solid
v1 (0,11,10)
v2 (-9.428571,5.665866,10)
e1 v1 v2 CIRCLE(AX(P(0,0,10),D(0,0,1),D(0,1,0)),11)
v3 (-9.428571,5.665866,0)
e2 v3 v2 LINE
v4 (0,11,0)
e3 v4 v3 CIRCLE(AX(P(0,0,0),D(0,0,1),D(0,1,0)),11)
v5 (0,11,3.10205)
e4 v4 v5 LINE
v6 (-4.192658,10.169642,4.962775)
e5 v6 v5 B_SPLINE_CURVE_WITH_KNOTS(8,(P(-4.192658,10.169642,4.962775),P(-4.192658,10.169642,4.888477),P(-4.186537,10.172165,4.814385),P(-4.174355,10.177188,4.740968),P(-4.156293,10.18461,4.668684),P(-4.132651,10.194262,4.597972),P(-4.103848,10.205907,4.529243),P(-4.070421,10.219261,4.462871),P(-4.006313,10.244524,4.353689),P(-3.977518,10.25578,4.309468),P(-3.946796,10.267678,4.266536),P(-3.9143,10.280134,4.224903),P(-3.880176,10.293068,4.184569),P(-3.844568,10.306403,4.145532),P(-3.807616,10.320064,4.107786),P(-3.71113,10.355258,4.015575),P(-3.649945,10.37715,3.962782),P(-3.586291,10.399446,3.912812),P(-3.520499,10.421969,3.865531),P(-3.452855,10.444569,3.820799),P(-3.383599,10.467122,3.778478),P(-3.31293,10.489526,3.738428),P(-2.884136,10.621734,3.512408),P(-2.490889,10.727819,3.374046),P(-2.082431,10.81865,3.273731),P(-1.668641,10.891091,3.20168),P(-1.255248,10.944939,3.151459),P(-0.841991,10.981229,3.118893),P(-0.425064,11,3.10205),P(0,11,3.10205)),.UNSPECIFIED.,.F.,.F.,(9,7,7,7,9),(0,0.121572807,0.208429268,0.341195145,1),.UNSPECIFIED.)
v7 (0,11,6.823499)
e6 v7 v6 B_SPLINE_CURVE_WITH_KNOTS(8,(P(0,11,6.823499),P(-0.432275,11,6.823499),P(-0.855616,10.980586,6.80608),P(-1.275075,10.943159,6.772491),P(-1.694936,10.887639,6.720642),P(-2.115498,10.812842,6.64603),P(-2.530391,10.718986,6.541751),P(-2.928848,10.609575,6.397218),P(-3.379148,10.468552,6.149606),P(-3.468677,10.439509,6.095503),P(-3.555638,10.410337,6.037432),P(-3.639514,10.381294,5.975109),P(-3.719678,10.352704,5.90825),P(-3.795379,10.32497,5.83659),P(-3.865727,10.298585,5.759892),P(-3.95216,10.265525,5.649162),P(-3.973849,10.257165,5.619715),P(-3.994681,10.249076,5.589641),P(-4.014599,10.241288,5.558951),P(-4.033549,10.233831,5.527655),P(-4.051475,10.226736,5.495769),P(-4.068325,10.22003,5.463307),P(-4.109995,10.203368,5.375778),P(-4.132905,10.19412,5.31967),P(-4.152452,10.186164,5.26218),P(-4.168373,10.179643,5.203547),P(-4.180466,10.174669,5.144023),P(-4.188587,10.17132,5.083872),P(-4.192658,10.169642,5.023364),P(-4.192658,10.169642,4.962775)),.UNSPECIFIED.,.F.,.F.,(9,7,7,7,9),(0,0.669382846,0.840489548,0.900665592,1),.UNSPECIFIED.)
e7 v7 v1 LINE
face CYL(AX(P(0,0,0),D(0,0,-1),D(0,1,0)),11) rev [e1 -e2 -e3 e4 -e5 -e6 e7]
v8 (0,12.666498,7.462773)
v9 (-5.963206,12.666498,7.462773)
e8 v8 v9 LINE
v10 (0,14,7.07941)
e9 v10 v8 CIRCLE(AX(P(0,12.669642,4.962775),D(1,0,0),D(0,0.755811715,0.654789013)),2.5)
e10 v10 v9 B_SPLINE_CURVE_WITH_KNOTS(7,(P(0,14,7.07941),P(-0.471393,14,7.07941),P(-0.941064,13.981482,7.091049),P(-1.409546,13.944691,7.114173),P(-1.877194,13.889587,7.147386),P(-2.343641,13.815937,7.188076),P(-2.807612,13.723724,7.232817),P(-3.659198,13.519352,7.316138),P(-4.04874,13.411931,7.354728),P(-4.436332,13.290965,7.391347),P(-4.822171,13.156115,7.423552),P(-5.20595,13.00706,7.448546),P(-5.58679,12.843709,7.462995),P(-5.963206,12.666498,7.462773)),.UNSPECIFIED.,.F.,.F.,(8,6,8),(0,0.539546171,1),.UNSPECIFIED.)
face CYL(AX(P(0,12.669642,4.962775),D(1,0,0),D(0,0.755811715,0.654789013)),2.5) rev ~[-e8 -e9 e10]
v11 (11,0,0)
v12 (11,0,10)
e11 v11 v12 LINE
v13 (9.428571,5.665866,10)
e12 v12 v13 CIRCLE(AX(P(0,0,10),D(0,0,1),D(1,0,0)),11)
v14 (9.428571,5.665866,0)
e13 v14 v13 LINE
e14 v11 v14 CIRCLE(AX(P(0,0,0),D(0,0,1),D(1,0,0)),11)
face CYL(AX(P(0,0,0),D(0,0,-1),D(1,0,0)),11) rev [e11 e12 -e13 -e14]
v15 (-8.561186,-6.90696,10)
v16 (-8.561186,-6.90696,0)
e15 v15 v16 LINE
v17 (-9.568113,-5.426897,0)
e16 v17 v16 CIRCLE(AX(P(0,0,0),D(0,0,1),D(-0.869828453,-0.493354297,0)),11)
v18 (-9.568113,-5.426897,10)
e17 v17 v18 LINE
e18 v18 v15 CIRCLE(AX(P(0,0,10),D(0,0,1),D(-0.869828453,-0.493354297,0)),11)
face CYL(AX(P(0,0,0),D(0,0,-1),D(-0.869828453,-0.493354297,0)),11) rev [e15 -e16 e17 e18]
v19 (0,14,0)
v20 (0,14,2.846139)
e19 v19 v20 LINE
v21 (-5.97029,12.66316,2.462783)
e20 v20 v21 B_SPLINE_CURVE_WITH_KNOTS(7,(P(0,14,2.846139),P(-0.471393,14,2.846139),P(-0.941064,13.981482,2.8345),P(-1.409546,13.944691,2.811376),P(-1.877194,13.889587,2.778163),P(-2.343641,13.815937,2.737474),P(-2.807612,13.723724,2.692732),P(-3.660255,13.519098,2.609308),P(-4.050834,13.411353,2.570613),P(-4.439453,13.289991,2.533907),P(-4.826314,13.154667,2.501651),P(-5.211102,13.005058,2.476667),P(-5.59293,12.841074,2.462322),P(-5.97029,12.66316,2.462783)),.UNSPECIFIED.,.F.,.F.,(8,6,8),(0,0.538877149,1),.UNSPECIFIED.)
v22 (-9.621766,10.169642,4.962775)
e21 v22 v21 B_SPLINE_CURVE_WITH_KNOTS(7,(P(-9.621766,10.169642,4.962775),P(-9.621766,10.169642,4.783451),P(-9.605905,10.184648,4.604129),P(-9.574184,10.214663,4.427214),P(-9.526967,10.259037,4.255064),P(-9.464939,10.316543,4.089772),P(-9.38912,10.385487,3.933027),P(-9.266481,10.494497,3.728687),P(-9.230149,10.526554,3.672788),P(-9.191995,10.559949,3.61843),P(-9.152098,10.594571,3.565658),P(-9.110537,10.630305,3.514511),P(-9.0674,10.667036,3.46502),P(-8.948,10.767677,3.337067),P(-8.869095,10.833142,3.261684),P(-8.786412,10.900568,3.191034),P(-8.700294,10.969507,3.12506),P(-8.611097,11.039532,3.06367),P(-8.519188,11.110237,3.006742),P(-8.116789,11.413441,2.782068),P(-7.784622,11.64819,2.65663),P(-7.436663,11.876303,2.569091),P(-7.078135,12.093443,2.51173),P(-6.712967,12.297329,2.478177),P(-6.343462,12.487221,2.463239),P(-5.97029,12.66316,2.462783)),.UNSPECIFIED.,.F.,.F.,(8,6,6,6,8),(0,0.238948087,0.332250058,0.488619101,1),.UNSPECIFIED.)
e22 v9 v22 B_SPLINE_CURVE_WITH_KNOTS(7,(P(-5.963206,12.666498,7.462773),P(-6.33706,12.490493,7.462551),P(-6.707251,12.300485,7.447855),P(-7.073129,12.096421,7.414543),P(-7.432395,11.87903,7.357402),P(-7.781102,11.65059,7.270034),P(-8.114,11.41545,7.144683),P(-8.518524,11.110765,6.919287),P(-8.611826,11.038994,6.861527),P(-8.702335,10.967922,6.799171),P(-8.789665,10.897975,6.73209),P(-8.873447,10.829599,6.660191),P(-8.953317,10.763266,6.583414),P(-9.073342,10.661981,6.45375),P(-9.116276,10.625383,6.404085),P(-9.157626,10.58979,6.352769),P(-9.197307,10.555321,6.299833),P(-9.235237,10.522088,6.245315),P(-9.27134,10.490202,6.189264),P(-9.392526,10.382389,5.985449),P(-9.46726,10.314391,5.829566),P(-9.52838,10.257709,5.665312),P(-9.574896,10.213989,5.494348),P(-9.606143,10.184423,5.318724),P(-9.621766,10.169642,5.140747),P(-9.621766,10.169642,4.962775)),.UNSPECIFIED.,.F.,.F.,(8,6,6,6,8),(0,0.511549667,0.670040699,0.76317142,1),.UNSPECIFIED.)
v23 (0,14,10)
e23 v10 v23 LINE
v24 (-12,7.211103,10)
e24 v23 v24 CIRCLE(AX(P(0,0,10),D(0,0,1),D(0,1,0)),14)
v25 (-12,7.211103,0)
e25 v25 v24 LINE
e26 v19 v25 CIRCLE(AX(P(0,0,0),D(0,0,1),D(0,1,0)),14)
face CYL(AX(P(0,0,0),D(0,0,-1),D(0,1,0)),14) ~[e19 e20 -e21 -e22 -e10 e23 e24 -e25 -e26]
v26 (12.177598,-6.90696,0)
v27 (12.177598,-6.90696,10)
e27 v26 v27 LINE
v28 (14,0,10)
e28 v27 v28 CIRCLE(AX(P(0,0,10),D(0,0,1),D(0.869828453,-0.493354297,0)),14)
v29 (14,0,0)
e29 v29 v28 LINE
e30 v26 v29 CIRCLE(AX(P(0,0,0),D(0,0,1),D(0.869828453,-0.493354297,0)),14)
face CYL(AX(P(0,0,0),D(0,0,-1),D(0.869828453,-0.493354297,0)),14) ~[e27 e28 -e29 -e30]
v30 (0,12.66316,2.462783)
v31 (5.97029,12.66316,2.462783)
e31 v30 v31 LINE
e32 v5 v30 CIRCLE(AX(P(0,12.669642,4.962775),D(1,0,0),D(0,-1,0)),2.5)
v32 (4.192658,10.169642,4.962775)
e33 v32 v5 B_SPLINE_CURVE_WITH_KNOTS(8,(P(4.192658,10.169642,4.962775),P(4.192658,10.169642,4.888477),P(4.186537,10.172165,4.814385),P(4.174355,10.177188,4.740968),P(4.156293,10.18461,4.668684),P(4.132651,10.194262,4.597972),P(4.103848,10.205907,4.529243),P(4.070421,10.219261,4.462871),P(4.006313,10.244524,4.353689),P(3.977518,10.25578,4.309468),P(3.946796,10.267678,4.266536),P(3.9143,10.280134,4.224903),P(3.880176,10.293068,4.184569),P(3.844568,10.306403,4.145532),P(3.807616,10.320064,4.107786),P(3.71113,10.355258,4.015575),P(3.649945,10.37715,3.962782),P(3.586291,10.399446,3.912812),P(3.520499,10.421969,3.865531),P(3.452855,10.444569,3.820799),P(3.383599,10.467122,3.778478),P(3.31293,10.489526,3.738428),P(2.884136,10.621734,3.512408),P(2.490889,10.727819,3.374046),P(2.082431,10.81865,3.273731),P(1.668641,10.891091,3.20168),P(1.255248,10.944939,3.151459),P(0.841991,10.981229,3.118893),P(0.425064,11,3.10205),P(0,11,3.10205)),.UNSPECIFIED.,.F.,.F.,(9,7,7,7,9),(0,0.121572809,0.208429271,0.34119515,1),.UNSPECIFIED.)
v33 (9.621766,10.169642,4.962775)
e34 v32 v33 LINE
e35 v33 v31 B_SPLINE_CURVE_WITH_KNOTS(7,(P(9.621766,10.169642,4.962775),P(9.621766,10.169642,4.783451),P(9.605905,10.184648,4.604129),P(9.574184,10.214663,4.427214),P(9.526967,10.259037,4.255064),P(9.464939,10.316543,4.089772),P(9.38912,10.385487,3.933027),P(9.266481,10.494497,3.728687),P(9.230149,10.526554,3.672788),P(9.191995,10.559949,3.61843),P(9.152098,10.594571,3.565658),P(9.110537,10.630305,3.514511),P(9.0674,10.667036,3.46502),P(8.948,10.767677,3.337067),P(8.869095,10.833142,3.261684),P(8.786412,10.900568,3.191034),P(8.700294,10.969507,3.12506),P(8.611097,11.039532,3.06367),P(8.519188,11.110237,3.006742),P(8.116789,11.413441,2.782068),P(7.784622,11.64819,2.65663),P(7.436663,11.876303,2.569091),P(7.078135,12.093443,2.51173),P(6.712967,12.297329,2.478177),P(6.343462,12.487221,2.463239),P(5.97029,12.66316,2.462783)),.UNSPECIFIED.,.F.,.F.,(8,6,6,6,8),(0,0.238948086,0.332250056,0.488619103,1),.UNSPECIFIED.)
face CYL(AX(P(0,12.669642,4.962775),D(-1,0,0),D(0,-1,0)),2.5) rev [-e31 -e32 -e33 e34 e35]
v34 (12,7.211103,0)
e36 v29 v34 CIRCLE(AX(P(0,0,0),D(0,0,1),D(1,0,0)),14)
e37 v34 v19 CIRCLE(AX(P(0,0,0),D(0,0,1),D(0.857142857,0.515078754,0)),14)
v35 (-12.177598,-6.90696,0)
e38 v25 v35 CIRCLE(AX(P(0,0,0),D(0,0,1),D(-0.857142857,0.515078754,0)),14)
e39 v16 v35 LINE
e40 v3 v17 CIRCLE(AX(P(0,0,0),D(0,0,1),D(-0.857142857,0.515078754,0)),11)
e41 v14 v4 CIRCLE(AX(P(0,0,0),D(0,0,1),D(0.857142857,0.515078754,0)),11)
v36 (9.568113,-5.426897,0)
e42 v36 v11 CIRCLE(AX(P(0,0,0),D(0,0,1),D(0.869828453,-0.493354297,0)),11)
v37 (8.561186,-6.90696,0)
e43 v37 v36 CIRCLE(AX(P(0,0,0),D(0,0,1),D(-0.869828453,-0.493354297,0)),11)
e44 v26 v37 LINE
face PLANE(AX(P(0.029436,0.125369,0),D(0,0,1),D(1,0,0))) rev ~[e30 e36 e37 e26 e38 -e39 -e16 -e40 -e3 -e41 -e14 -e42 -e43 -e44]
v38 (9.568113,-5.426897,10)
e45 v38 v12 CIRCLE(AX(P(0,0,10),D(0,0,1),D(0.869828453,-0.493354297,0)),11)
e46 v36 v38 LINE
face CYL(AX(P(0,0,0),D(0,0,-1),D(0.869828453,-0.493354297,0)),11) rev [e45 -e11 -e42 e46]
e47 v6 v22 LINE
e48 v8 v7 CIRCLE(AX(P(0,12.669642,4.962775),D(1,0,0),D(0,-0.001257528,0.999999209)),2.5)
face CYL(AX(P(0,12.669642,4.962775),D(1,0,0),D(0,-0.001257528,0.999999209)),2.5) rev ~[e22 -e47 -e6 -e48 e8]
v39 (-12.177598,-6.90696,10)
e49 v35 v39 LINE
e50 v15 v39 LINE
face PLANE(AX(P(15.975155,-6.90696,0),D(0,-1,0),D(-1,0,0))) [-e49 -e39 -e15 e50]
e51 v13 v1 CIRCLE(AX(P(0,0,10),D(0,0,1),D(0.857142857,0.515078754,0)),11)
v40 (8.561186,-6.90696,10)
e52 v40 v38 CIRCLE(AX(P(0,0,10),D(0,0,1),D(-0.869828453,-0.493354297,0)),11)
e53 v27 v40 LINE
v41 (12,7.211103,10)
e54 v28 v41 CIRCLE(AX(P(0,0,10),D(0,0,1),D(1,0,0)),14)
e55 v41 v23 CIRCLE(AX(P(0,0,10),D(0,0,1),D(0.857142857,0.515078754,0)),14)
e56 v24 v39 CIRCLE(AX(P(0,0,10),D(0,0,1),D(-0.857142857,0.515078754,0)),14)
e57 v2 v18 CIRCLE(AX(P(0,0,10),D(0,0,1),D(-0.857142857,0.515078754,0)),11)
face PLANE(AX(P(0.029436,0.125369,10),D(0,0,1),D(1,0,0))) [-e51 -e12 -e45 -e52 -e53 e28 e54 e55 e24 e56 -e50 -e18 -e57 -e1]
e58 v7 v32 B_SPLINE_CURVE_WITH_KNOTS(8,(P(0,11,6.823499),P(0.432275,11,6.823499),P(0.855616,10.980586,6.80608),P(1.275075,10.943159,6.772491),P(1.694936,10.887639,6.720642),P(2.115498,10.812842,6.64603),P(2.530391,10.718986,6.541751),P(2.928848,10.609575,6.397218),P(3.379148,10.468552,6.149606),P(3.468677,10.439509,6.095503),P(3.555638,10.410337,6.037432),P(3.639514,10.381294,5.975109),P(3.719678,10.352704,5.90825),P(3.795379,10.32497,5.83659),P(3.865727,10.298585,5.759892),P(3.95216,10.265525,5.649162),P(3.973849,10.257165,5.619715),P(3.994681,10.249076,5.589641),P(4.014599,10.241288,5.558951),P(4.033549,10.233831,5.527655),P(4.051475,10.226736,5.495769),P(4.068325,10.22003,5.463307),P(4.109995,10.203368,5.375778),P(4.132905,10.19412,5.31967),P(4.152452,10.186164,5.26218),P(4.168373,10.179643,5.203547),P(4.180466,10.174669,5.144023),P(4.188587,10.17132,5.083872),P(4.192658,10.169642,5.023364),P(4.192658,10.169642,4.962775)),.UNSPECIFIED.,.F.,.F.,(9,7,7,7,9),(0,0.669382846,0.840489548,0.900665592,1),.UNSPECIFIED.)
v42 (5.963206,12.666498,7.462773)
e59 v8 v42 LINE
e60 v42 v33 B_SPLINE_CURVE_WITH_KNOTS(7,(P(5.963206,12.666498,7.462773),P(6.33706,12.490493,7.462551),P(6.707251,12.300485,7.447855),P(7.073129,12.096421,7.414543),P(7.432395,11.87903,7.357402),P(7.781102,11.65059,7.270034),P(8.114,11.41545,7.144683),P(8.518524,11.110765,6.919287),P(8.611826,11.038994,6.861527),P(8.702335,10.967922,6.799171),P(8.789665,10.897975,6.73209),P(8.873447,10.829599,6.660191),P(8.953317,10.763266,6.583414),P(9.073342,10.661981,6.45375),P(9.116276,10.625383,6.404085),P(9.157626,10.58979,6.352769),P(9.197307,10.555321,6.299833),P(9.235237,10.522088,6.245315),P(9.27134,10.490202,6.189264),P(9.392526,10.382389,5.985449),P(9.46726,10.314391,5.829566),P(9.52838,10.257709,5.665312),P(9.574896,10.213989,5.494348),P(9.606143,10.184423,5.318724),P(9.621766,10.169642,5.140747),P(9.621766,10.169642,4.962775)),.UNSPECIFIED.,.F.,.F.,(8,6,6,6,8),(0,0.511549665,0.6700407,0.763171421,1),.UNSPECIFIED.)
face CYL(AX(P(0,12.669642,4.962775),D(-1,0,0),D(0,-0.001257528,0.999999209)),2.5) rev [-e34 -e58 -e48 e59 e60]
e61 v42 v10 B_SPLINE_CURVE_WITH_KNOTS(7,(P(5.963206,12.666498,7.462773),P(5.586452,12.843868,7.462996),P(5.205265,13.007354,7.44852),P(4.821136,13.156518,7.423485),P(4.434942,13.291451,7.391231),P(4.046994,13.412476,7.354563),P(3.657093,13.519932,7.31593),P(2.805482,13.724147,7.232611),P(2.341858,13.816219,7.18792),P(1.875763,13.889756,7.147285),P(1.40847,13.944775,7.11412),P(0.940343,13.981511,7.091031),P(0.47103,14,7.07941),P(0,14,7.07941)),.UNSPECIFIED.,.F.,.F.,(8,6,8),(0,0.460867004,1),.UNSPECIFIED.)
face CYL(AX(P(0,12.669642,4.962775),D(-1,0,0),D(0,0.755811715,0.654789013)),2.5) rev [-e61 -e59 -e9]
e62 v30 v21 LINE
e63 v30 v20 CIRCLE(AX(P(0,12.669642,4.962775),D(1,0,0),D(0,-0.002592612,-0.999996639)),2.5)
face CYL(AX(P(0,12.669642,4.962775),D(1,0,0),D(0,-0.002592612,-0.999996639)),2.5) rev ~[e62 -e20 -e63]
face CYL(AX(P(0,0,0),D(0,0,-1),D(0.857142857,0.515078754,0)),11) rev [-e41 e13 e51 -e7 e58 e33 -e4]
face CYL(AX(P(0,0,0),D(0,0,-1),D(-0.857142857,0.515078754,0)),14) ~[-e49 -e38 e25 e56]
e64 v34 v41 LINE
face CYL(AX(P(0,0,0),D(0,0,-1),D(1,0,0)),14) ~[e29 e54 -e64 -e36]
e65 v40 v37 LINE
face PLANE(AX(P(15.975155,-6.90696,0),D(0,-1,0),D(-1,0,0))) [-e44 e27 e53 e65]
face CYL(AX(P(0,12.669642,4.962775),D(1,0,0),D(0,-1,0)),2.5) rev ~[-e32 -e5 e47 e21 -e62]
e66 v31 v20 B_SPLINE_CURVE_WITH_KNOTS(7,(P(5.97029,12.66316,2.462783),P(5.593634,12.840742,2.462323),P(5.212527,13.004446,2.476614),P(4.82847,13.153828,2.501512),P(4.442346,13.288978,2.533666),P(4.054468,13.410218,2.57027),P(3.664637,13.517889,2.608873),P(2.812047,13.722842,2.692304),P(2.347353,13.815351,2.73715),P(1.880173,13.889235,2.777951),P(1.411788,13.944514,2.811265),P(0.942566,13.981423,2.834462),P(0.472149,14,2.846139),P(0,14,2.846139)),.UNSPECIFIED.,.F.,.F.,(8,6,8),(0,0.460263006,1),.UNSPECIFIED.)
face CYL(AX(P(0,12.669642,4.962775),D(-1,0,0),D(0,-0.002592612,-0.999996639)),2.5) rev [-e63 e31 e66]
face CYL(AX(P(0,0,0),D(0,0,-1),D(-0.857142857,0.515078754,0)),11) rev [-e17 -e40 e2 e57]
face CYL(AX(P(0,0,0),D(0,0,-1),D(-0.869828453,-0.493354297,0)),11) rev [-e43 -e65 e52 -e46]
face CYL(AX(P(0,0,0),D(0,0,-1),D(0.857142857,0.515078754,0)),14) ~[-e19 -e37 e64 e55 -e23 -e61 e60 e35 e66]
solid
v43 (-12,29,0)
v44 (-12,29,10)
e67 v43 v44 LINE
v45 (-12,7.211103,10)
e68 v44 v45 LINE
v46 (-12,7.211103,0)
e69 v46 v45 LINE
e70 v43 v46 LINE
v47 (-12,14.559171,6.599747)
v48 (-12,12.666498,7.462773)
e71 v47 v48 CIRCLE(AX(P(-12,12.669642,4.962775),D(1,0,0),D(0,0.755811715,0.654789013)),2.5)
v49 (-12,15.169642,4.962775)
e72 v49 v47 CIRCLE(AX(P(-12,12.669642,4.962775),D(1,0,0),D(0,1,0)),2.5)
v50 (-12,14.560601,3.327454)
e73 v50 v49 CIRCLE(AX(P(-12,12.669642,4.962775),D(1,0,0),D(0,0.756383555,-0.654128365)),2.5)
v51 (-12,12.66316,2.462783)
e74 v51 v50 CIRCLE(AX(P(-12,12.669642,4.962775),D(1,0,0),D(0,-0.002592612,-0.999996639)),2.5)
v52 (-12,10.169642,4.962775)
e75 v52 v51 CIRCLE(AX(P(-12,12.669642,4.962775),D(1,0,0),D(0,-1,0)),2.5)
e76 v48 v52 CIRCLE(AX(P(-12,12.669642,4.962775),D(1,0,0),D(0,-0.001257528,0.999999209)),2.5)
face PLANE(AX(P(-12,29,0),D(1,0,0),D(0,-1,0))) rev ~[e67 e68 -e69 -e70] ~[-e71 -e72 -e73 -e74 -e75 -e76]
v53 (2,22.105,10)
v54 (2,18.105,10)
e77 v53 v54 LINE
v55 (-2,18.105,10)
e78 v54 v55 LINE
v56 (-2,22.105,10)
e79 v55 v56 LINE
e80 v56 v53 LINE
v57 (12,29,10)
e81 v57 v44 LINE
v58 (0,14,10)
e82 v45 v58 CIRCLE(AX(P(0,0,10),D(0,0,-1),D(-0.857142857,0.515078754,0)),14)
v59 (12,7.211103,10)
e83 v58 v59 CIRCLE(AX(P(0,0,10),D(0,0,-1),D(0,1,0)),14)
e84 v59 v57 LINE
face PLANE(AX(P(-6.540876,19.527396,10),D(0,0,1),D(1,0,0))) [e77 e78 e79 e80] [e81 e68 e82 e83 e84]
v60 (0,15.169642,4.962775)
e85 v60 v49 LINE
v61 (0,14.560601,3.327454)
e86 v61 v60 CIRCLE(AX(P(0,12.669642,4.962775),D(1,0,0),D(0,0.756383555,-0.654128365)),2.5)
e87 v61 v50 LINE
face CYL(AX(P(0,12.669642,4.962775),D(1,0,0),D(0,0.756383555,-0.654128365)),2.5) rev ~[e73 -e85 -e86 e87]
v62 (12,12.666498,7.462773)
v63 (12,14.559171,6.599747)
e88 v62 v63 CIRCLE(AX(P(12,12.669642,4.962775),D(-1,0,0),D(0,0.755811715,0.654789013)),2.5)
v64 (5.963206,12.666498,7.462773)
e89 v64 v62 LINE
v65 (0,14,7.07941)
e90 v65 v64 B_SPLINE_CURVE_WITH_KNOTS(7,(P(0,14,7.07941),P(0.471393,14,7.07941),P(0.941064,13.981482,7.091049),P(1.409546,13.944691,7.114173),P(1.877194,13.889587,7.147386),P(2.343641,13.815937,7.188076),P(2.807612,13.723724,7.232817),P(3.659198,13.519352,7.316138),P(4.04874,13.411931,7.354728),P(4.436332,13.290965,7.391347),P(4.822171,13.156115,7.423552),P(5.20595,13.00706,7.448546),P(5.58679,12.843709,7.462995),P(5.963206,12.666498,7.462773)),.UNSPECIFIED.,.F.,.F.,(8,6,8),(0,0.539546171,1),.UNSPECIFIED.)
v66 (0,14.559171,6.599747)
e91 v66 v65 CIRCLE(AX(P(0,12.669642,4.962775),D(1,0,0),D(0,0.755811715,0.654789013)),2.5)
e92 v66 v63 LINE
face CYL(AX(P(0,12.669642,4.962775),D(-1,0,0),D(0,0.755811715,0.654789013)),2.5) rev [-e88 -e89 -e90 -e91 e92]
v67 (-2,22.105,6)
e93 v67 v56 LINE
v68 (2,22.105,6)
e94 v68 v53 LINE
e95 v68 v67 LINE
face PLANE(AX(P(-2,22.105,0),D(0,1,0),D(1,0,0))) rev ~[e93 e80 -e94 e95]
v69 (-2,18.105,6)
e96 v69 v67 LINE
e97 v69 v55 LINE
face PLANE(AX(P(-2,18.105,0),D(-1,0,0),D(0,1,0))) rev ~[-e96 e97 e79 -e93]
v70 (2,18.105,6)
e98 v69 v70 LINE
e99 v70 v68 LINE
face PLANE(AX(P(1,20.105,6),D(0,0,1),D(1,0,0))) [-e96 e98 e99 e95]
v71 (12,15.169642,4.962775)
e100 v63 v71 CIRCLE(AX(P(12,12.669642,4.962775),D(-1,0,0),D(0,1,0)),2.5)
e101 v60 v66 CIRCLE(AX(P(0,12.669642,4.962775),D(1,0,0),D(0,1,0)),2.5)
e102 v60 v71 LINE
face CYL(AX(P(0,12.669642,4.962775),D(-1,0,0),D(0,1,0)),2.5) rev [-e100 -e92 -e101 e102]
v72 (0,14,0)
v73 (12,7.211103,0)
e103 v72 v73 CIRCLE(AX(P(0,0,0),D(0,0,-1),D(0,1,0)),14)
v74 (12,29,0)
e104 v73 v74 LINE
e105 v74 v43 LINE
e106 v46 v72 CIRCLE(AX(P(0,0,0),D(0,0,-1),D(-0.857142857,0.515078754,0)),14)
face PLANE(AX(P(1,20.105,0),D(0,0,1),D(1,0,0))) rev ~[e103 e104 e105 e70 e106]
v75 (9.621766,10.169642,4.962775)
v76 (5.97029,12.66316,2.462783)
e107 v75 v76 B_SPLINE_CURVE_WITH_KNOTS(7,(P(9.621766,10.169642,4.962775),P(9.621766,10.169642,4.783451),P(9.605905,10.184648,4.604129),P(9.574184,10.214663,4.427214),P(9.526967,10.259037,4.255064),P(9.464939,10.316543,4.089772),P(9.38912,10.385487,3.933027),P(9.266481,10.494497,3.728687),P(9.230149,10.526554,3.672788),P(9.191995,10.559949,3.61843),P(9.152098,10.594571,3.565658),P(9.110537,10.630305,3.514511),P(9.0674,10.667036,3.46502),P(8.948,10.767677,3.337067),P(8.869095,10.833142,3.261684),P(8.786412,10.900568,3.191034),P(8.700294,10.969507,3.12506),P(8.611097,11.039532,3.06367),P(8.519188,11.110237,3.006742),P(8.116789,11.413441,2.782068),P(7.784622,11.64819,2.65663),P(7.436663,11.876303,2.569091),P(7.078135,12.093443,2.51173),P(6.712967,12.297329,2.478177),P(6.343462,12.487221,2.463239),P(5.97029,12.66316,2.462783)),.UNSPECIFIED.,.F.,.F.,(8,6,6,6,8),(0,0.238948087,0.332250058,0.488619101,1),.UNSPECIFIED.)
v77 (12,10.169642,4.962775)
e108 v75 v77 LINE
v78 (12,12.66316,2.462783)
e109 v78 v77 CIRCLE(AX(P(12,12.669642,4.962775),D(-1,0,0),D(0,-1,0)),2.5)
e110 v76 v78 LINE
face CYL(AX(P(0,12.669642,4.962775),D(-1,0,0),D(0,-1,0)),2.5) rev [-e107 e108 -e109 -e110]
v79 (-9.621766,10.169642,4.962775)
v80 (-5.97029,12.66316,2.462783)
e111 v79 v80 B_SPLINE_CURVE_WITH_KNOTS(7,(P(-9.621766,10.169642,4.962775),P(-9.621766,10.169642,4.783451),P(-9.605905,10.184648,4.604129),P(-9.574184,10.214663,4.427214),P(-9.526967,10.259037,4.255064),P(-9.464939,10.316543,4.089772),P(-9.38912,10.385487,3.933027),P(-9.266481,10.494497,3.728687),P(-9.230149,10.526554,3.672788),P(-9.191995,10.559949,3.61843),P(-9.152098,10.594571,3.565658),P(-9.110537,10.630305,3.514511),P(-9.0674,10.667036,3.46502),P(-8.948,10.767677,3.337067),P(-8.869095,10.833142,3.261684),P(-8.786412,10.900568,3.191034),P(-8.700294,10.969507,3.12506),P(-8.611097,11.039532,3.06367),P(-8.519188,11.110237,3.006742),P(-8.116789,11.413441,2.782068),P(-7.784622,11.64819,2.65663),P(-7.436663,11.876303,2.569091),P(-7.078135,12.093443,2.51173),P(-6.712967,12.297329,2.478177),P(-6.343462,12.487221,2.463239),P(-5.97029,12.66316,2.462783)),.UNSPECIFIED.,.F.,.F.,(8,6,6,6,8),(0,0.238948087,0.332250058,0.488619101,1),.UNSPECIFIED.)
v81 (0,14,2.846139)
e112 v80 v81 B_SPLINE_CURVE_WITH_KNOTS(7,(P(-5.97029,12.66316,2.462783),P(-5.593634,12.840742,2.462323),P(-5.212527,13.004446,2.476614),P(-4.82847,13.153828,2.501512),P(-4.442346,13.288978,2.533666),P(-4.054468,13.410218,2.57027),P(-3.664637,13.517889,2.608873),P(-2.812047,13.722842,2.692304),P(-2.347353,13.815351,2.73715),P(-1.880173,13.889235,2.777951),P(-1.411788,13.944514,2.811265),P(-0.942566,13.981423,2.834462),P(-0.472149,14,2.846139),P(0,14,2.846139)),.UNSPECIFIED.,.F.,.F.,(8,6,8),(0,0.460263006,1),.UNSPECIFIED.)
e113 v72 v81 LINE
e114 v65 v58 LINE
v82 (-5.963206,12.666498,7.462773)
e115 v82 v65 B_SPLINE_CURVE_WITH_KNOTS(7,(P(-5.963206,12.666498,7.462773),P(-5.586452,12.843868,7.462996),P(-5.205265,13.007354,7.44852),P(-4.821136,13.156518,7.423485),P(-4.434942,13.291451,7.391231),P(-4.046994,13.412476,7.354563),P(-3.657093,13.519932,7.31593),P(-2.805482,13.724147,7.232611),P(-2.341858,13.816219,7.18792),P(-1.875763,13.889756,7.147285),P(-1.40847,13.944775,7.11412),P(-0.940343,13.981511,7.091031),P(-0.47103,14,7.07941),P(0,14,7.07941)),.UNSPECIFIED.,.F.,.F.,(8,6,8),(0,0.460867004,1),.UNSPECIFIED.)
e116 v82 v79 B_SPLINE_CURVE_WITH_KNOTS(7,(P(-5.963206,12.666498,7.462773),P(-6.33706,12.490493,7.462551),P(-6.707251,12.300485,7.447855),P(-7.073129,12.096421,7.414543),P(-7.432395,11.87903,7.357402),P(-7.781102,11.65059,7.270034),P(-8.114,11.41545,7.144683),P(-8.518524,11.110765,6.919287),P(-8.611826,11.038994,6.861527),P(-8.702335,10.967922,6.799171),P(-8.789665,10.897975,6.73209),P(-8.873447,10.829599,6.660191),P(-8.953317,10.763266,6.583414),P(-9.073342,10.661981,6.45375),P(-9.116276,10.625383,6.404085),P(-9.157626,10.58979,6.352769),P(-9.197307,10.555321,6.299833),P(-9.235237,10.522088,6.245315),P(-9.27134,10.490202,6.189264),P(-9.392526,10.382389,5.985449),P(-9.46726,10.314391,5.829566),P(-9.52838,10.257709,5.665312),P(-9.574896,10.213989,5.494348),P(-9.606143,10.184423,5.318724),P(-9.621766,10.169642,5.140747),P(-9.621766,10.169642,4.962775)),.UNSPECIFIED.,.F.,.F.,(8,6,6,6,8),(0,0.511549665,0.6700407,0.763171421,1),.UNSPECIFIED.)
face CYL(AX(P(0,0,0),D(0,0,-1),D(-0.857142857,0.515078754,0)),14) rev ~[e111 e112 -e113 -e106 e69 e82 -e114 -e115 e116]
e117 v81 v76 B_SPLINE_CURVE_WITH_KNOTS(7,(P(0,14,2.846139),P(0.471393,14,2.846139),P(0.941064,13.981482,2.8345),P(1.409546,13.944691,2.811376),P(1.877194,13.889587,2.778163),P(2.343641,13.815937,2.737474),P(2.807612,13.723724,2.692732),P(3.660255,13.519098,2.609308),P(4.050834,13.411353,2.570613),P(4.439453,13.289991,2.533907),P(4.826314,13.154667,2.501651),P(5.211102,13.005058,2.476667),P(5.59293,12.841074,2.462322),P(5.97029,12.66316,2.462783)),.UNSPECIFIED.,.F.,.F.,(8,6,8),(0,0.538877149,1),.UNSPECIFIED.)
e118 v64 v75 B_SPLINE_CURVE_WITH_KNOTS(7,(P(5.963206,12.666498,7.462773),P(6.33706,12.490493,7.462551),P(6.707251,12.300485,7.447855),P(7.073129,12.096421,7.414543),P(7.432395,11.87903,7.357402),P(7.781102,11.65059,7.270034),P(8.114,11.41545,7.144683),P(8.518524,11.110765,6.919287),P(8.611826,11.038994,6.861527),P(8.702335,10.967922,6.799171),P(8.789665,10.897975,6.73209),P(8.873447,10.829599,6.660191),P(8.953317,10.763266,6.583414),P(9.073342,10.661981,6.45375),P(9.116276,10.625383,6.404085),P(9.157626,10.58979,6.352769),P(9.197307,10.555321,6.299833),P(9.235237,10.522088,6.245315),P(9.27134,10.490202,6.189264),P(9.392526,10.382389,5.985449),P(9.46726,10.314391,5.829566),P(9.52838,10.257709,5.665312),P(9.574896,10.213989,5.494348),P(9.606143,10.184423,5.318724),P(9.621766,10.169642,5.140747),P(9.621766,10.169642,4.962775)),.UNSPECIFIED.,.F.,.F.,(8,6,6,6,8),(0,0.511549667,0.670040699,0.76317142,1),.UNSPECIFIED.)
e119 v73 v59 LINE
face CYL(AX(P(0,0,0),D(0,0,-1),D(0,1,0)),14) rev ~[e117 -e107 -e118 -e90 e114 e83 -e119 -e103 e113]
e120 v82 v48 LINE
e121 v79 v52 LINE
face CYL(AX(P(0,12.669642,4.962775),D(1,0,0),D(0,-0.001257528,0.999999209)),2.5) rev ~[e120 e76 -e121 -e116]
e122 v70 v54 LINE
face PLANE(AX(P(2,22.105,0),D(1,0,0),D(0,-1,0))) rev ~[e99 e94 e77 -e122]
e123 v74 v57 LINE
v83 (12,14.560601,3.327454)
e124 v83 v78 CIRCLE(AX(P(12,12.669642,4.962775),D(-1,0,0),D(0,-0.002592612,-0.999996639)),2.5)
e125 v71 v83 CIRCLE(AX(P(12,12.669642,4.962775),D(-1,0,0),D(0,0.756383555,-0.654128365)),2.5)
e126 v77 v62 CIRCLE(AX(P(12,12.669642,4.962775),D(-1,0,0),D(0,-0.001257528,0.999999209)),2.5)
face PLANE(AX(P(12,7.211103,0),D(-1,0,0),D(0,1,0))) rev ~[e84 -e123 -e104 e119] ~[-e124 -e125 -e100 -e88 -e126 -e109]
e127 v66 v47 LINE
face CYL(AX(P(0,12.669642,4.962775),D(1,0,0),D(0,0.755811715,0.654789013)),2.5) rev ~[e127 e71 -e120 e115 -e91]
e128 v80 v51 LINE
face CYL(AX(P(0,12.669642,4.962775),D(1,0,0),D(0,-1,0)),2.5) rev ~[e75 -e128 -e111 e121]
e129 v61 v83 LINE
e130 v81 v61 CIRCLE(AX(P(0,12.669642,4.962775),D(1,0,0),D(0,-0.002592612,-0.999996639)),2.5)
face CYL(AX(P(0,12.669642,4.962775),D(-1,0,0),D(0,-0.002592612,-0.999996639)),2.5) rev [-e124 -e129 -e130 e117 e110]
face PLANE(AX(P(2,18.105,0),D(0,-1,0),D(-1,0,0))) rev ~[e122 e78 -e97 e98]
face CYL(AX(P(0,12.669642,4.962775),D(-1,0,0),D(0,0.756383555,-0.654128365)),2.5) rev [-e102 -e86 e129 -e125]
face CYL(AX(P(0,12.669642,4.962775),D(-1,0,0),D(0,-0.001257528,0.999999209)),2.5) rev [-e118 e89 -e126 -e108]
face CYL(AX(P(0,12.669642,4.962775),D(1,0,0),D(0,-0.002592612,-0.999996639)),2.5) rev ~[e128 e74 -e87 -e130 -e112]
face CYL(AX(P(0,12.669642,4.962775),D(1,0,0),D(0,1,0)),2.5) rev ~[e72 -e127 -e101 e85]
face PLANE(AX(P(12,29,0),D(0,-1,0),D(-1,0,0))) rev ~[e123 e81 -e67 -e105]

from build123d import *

# Parameters (mm, degrees)
F1_DEPTH      = 10
F2_DEPTH      = 10
F3_T          = -3
F4_DEPTH      = 10
F6_DEPTH      = 25
F6_DEPTH_BACK = 25
F0_W          = 2
F0_H          = 4
F7_DEPTH      = 6


# Not quite as in the source:
# - a feature names something its author has since deleted; it is built from what else it names


with BuildPart() as f1:
    # F0 (on Top) → F1 (new body)
    with BuildSketch(Plane.XY):
        with BuildLine():
            ThreePointArc((12.177598341, -6.9069601595), (13.5367347757, -3.5716679035), (14, 0))
            ThreePointArc((14, 0), (13.4907375632, 3.7416573868), (12, 7.2111025509))
            Line((12, 7.2111025509), (-12, 7.2111025509))
            ThreePointArc((-12, 7.2111025509), (-13.9988924226, 0.1760992369), (-12.177598341, -6.9069601595))
            Line((-12.177598341, -6.9069601595), (12.177598341, -6.9069601595))
        make_face()
        with BuildLine():
            ThreePointArc((-12.177598341, -6.9069601595), (0, -14), (12.177598341, -6.9069601595))
            Line((12.177598341, -6.9069601595), (-12.177598341, -6.9069601595))
        make_face()
        with BuildLine():
            Line((-12, 7.2111025509), (12, 7.2111025509))
            ThreePointArc((12, 7.2111025509), (6.8936407031, 12.1851433252), (0, 14))
            ThreePointArc((0, 14), (-6.8936407031, 12.1851433252), (-12, 7.2111025509))
        make_face()
    extrude(amount=F1_DEPTH)

    # F3
    f3_openings = [f1.faces().sort_by_distance(p)[0] for p in [
        (0, 0, 0),
        (0, 0, 10),
    ]]
    offset(amount=F3_T, openings=f3_openings)

    # F0 (on Top) → F4 (cut)
    with BuildSketch(Plane.XY):
        with BuildLine():
            Line((15.9751549363, -6.9069601595), (12.177598341, -6.9069601595))
            ThreePointArc((12.177598341, -6.9069601595), (0, -14), (-12.177598341, -6.9069601595))
            Line((-12.177598341, -6.9069601595), (-18.203439191, -6.9069601595))
            Line((-18.203439191, -6.9069601595), (-18.203439191, -17.6538378))
            Line((-18.203439191, -17.6538378), (15.9751549363, -17.6538378))
            Line((15.9751549363, -17.6538378), (15.9751549363, -6.9069601595))
        make_face()
        with BuildLine():
            ThreePointArc((-12.177598341, -6.9069601595), (0, -14), (12.177598341, -6.9069601595))
            Line((12.177598341, -6.9069601595), (-12.177598341, -6.9069601595))
        make_face()
    extrude(amount=F4_DEPTH, mode=Mode.SUBTRACT)


with BuildPart() as f2:
    # F0 (on Top) → F2 (new body)
    with BuildSketch(Plane.XY):
        with BuildLine():
            ThreePointArc((-12, 7.2111025509), (-6.8936407031, 12.1851433252), (0, 14))
            Line((0, 14), (0, 18.105))
            Line((0, 18.105), (-2, 18.105))
            Line((-2, 18.105), (-2, 22.105))
            Line((-2, 22.105), (0, 22.105))
            Line((0, 22.105), (0, 29))
            Line((0, 29), (-12, 29))
            Line((-12, 29), (-12, 7.2111025509))
        make_face()
        with BuildLine():
            ThreePointArc((0, 14), (6.8936407031, 12.1851433252), (12, 7.2111025509))
            Line((12, 7.2111025509), (12, 29))
            Line((12, 29), (0, 29))
            Line((0, 29), (0, 22.105))
            Line((0, 22.105), (2, 22.105))
            Line((2, 22.105), (2, 18.105))
            Line((2, 18.105), (0, 18.105))
            Line((0, 18.105), (0, 14))
        make_face()
    extrude(amount=F2_DEPTH)


with BuildPart() as f6_tool:
    # F5 (on Right) → F6 (new body, two sides)
    with BuildSketch(Plane.YZ) as f6_sk:
        with BuildLine():
            ThreePointArc((14.5591712674, 6.5997470737), (13.7068573789, 7.2374578628), (12.6664981618, 7.4627725634))
            Line((12.6664981618, 7.4627725634), (14.5591712674, 6.5997470737))
        make_face()
        with BuildLine():
            ThreePointArc((12.6664981618, 7.4627725634), (10.9007638693, 6.7294296355), (10.1696419809, 4.9627745402))
            Line((10.1696419809, 4.9627745402), (15.1696419809, 4.9627745402))
            ThreePointArc((15.1696419809, 4.9627745402), (15.0120577442, 5.8363238473), (14.5591712674, 6.5997470737))
            Line((14.5591712674, 6.5997470737), (12.6664981618, 7.4627725634))
        make_face()
        with BuildLine():
            ThreePointArc((10.1696419809, 4.9627745402), (10.8995849446, 3.1973006411), (12.6631604515, 2.4627829422))
            Line((12.6631604515, 2.4627829422), (14.5606008683, 3.3274536278))
            ThreePointArc((14.5606008683, 3.3274536278), (15.0124391572, 4.0902486719), (15.1696419809, 4.9627745402))
            Line((15.1696419809, 4.9627745402), (10.1696419809, 4.9627745402))
        make_face()
        with BuildLine():
            Line((14.5606008683, 3.3274536278), (12.6631604515, 2.4627829422))
            ThreePointArc((12.6631604515, 2.4627829422), (13.7063326661, 2.6878520309), (14.5606008683, 3.3274536278))
        make_face()
    extrude(amount=-F6_DEPTH)
    extrude(f6_sk.sketch, amount=F6_DEPTH_BACK)


with BuildPart() as f1_1:
    add(f1.part)

    # F6: cut by f6_tool
    add(f6_tool.part, mode=Mode.SUBTRACT)


with BuildPart() as f2_1:
    add(f2.part)

    # F6: cut by f6_tool
    add(f6_tool.part, mode=Mode.SUBTRACT)

    # F0 (on Top) → F7 (join)
    with BuildSketch(Plane.XY):
        with Locations((1, 20.105)):
            Rectangle(F0_W, F0_H)
        with Locations((-1, 20.105)):
            Rectangle(F0_W, F0_H)
    extrude(amount=F7_DEPTH)


solid = Compound([f1_1.part, f2_1.part])
